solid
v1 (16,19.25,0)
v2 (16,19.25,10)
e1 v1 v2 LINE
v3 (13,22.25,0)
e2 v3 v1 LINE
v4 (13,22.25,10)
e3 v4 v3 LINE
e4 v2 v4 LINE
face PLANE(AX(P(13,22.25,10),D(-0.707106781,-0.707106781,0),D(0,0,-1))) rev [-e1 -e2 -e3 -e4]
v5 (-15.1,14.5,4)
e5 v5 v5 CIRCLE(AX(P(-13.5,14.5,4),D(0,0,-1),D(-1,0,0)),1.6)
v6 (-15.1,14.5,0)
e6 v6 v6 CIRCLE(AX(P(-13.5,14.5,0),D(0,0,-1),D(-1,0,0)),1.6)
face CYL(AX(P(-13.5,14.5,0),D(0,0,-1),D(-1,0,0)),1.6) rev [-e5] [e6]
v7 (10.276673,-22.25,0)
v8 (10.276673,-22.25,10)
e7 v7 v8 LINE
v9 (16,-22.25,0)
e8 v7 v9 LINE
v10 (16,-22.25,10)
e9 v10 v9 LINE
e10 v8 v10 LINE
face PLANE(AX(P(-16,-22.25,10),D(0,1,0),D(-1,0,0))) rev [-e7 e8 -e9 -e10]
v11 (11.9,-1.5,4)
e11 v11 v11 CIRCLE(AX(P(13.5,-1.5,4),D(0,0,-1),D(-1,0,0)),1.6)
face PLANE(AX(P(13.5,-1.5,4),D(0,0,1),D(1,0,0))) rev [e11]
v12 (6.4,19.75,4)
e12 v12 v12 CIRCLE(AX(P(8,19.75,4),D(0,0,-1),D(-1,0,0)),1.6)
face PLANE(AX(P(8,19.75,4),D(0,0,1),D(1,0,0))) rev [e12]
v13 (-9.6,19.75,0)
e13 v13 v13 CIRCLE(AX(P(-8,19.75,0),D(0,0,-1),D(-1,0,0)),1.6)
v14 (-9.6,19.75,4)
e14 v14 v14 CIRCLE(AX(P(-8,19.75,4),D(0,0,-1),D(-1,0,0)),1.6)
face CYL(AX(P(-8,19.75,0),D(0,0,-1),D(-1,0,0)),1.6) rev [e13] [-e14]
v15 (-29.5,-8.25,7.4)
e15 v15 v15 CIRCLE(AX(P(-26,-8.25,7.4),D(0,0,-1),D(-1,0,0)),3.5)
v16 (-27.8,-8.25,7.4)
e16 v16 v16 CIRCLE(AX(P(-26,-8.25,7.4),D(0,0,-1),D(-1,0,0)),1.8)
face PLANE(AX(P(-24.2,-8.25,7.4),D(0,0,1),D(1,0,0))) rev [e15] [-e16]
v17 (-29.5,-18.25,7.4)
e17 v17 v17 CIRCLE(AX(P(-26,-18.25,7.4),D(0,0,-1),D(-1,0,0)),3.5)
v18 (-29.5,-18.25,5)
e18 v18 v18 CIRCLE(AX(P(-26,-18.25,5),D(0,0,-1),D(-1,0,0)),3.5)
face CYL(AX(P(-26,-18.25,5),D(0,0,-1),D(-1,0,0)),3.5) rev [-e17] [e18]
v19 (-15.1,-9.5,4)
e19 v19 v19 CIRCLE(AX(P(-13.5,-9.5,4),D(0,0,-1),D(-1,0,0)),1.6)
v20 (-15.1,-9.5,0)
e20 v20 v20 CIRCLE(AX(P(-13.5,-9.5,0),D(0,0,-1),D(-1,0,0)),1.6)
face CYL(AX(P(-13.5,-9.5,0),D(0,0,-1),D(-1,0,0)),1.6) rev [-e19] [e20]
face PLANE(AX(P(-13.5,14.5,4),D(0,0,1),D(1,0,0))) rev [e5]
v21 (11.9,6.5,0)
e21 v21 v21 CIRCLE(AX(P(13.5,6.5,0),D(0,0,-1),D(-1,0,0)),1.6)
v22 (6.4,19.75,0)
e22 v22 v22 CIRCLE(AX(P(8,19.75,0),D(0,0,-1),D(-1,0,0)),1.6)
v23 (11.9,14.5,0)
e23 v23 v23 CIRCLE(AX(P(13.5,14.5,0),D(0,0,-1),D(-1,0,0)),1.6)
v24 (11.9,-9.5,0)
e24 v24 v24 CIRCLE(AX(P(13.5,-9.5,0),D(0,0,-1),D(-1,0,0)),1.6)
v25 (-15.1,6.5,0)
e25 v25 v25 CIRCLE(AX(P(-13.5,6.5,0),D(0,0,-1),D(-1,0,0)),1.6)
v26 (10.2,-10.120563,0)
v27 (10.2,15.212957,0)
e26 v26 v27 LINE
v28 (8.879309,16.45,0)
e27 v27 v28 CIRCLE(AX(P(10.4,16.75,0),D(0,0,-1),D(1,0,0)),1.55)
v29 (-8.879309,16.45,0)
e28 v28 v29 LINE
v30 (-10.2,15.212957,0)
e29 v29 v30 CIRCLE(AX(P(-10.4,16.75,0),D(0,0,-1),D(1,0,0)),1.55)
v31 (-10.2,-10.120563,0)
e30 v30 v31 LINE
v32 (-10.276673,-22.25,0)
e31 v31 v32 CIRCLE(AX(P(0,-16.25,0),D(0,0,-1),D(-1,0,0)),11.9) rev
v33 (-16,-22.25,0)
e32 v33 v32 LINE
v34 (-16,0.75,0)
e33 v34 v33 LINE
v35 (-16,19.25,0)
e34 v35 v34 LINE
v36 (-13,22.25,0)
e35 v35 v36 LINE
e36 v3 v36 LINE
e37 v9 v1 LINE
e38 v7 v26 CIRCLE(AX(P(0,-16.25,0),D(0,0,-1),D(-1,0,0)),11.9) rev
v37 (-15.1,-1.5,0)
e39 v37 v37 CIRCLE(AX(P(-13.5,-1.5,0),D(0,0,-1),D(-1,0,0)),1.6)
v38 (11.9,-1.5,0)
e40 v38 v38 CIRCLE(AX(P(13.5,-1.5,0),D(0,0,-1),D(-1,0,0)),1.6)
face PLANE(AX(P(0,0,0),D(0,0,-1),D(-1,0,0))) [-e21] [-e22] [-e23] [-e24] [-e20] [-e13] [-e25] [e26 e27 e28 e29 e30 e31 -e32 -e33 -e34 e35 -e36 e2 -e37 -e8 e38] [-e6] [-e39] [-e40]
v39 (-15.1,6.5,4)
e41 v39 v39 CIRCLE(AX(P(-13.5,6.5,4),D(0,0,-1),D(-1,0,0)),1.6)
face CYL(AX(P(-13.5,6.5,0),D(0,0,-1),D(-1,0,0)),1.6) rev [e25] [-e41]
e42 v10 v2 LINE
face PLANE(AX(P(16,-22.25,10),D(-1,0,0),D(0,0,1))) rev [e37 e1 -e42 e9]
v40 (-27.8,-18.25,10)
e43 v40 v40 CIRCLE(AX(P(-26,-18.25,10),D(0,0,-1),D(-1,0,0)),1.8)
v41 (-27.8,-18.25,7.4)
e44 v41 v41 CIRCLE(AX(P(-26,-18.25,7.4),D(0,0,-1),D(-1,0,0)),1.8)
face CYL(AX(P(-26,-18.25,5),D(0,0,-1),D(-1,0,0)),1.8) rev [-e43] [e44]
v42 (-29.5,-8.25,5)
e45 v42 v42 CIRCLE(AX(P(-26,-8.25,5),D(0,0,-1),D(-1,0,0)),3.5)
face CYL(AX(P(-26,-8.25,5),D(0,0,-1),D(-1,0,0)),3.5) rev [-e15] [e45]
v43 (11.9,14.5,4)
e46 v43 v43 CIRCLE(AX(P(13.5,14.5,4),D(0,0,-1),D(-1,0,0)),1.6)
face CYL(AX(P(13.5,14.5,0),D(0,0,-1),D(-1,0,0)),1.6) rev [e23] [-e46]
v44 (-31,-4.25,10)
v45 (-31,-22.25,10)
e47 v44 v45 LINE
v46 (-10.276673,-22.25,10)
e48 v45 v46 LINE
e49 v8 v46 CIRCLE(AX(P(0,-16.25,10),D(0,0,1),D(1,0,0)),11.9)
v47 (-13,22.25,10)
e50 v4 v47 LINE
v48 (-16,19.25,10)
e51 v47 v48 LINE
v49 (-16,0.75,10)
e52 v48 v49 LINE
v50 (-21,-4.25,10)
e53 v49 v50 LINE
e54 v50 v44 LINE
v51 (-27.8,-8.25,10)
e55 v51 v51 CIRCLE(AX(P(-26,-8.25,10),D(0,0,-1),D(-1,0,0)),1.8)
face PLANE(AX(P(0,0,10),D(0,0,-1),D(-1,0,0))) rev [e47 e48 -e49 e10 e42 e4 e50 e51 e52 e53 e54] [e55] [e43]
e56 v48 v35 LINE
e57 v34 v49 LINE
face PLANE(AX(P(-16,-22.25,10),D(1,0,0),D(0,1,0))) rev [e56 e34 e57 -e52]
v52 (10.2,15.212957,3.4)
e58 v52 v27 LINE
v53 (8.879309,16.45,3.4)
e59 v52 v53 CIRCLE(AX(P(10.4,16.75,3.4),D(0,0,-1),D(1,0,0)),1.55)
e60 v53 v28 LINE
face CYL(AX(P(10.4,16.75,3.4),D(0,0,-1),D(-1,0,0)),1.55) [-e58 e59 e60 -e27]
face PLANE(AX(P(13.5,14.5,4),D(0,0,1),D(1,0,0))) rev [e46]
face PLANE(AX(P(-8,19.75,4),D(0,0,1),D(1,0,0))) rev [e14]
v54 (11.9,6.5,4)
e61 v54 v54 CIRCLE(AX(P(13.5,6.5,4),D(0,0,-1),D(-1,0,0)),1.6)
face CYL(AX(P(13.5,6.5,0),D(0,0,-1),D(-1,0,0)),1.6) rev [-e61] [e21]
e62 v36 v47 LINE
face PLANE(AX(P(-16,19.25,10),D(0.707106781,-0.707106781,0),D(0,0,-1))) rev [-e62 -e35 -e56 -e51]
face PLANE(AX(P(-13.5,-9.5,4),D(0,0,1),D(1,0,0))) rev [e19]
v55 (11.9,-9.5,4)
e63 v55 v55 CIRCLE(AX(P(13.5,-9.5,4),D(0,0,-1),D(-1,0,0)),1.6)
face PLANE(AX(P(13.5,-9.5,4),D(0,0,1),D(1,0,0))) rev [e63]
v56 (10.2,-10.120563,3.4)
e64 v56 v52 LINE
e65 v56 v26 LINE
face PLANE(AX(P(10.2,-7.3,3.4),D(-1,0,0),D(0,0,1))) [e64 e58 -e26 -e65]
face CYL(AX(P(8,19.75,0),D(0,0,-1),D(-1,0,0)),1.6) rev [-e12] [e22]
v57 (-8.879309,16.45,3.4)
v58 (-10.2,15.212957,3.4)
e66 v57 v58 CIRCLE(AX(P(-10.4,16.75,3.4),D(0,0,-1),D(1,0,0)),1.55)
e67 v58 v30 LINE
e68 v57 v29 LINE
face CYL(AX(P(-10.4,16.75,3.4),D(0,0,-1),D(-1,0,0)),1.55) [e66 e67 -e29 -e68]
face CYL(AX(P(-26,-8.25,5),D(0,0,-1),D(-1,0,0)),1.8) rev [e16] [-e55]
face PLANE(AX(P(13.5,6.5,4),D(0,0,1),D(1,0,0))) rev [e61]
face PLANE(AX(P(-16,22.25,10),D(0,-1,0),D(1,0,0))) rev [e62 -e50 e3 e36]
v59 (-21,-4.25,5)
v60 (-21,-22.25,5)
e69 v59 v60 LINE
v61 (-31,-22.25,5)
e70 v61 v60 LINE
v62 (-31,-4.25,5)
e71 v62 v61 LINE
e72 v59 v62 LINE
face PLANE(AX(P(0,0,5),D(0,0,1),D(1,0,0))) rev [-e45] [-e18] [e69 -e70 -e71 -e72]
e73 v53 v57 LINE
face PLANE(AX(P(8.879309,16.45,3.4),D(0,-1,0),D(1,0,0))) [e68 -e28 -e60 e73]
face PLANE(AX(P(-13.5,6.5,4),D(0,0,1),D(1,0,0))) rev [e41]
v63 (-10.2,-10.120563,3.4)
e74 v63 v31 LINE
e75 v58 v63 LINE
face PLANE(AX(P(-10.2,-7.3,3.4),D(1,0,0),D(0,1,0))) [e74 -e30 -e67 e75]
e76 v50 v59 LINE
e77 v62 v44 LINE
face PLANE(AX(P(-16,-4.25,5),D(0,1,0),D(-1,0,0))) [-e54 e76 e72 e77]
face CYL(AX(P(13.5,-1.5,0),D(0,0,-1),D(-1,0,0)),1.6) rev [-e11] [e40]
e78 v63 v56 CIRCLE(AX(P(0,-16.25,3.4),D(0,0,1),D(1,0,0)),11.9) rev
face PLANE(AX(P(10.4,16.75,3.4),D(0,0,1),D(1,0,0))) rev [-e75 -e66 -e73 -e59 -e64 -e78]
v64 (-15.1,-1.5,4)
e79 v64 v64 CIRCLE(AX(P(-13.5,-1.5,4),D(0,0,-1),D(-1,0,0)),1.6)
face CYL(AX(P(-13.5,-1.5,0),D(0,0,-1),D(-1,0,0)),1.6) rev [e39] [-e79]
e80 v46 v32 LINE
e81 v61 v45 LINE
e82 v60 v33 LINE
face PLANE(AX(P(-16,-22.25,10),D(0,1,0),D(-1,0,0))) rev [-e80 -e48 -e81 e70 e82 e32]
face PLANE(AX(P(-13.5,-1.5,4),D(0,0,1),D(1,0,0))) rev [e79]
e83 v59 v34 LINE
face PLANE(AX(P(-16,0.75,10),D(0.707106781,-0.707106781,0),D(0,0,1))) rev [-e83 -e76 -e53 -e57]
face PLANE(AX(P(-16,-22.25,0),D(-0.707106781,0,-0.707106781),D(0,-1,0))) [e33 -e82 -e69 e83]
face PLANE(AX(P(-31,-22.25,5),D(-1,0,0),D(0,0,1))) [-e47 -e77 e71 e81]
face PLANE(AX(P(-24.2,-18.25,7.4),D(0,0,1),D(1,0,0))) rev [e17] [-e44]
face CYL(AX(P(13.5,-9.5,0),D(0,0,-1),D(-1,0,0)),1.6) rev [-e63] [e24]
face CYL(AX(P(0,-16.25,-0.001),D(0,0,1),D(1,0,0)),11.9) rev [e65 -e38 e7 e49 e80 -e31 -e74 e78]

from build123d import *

# Parameters (mm, degrees)
SZKIC1_W                                          = 32
SZKIC1_H                                          = 44.5
DODANIE_WYCI_GNI_CIE1_DEPTH                       = 10
WYTNIJ_WYCI_GNI_CIE1_REACH                        = 31.173
SZKIC2_R                                          = 11.9
WYTNIJ_WYCI_GNI_CIE2_DEPTH                        = 3.4
OTW_R_3_2_3_2_1_D                                 = 3.2
OTW_R_3_2_3_2_1_DEPTH                             = 4
SZKIC7_W                                          = 15
SZKIC7_H                                          = 18
DODANIE_WYCI_GNI_CIE2_DEPTH                       = 5
SFAZOWANIE1_SIZE                                  = 5
SFAZOWANIE2_SIZE                                  = 3
POG_BIENIE_WALCOWE_POD_M3_RUB_Z_BEM_S_D           = 3.6
POG_BIENIE_WALCOWE_POD_M3_RUB_Z_BEM_S_DEPTH       = 24
POG_BIENIE_WALCOWE_POD_M3_RUB_Z_BEM_S_CBORE_D     = 7
POG_BIENIE_WALCOWE_POD_M3_RUB_Z_BEM_S_CBORE_DEPTH = 2.4
POG_BIENIE_WALCOWE_POD_M3_RUB_Z_BEM_S_TIP         = 1.081549114


with BuildPart() as part:
    # Szkic1 → Dodanie-wyciągnięcie1 (new body)
    with BuildSketch(Plane.XY):
        Rectangle(SZKIC1_W, SZKIC1_H)
    extrude(amount=DODANIE_WYCI_GNI_CIE1_DEPTH)

    # Szkic2 → Wytnij-wyciągnięcie1 (cut, up to next)
    with BuildSketch(Plane.XY.offset(10), mode=Mode.PRIVATE) as wytnij_wyci_gni_cie1_sk1:
        with Locations((0, -16.25)):
            Circle(SZKIC2_R)
    wytnij_wyci_gni_cie1_tool1 = extrude(wytnij_wyci_gni_cie1_sk1.sketch, amount=-WYTNIJ_WYCI_GNI_CIE1_REACH, mode=Mode.PRIVATE) & part.part
    add(wytnij_wyci_gni_cie1_tool1.solids().sort_by_distance((0, -16.25, 10))[0], mode=Mode.SUBTRACT)

    # Szkic3 → Wytnij-wyciągnięcie2 (cut)
    with BuildSketch(Plane.XY):
        with BuildLine():
            Line((10.2, -7.3), (10.2, 15.212957385))
            ThreePointArc((10.2, 15.212957385), (9.34039504, 15.618745241), (8.879309367, 16.45))
            Line((8.879309367, 16.45), (-8.879309367, 16.45))
            ThreePointArc((-8.879309367, 16.45), (-9.34039504, 15.618745241), (-10.2, 15.212957385))
            Line((-10.2, 15.212957385), (-10.2, -7.3))
            Line((-10.2, -7.3), (-10.2, -10.120562832))
            Line((-10.2, -10.120562832), (10.2, -10.120562832))
            Line((10.2, -10.120562832), (10.2, -7.3))
        make_face()
    extrude(amount=WYTNIJ_WYCI_GNI_CIE2_DEPTH, mode=Mode.SUBTRACT)

    # Otwór Ø3.2 (3.2)1
    with Locations(Plane(origin=(0, 0, 0), x_dir=(-1, 0, 0), z_dir=(0, 0, -1))):
        with Locations((8, 19.75), (13.5, 14.5), (13.5, 6.5), (13.5, -1.5), (13.5, -9.5), (-13.5, -9.5), (-13.5, -1.5), (-13.5, 6.5), (-13.5, 14.5), (-8, 19.75)):
            Hole(OTW_R_3_2_3_2_1_D / 2, depth=OTW_R_3_2_3_2_1_DEPTH)

    # Szkic7 → Dodanie-wyciągnięcie2 (add)
    with BuildSketch(Plane.XY.offset(10)):
        with Locations((-23.5, -13.25)):
            Rectangle(SZKIC7_W, SZKIC7_H)
    extrude(amount=-DODANIE_WYCI_GNI_CIE2_DEPTH)

    # Sfazowanie1
    sfazowanie1_edges = [part.edges().sort_by_distance(p)[0] for p in [
        (-16, -13.25, 5),
        (-16, -4.25, 7.5),
    ]]
    chamfer(sfazowanie1_edges, length=SFAZOWANIE1_SIZE - 0.0001)  # a hair under: the kernel refuses the full size

    # Sfazowanie2
    sfazowanie2_edges = [part.edges().sort_by_distance(p)[0] for p in [
        (-16, 22.25, 5),
        (16, 22.25, 5),
    ]]
    chamfer(sfazowanie2_edges, length=SFAZOWANIE2_SIZE)

    # Pogłębienie walcowe pod M3 Śrubę z łbem stożkowym ściętym1
    with Locations(Plane(origin=(0, 0, 5), x_dir=(-1, 0, 0), z_dir=(0, 0, -1))):
        with Locations((26, -18.25), (26, -8.25)):
            CounterBoreHole(POG_BIENIE_WALCOWE_POD_M3_RUB_Z_BEM_S_D / 2, POG_BIENIE_WALCOWE_POD_M3_RUB_Z_BEM_S_CBORE_D / 2, POG_BIENIE_WALCOWE_POD_M3_RUB_Z_BEM_S_CBORE_DEPTH, depth=POG_BIENIE_WALCOWE_POD_M3_RUB_Z_BEM_S_DEPTH)
            with Locations((0, 0, -(POG_BIENIE_WALCOWE_POD_M3_RUB_Z_BEM_S_DEPTH + POG_BIENIE_WALCOWE_POD_M3_RUB_Z_BEM_S_TIP / 2))):  # 118° drill point
                Cone(0, POG_BIENIE_WALCOWE_POD_M3_RUB_Z_BEM_S_D / 2, POG_BIENIE_WALCOWE_POD_M3_RUB_Z_BEM_S_TIP, mode=Mode.SUBTRACT)


solid = part.part
